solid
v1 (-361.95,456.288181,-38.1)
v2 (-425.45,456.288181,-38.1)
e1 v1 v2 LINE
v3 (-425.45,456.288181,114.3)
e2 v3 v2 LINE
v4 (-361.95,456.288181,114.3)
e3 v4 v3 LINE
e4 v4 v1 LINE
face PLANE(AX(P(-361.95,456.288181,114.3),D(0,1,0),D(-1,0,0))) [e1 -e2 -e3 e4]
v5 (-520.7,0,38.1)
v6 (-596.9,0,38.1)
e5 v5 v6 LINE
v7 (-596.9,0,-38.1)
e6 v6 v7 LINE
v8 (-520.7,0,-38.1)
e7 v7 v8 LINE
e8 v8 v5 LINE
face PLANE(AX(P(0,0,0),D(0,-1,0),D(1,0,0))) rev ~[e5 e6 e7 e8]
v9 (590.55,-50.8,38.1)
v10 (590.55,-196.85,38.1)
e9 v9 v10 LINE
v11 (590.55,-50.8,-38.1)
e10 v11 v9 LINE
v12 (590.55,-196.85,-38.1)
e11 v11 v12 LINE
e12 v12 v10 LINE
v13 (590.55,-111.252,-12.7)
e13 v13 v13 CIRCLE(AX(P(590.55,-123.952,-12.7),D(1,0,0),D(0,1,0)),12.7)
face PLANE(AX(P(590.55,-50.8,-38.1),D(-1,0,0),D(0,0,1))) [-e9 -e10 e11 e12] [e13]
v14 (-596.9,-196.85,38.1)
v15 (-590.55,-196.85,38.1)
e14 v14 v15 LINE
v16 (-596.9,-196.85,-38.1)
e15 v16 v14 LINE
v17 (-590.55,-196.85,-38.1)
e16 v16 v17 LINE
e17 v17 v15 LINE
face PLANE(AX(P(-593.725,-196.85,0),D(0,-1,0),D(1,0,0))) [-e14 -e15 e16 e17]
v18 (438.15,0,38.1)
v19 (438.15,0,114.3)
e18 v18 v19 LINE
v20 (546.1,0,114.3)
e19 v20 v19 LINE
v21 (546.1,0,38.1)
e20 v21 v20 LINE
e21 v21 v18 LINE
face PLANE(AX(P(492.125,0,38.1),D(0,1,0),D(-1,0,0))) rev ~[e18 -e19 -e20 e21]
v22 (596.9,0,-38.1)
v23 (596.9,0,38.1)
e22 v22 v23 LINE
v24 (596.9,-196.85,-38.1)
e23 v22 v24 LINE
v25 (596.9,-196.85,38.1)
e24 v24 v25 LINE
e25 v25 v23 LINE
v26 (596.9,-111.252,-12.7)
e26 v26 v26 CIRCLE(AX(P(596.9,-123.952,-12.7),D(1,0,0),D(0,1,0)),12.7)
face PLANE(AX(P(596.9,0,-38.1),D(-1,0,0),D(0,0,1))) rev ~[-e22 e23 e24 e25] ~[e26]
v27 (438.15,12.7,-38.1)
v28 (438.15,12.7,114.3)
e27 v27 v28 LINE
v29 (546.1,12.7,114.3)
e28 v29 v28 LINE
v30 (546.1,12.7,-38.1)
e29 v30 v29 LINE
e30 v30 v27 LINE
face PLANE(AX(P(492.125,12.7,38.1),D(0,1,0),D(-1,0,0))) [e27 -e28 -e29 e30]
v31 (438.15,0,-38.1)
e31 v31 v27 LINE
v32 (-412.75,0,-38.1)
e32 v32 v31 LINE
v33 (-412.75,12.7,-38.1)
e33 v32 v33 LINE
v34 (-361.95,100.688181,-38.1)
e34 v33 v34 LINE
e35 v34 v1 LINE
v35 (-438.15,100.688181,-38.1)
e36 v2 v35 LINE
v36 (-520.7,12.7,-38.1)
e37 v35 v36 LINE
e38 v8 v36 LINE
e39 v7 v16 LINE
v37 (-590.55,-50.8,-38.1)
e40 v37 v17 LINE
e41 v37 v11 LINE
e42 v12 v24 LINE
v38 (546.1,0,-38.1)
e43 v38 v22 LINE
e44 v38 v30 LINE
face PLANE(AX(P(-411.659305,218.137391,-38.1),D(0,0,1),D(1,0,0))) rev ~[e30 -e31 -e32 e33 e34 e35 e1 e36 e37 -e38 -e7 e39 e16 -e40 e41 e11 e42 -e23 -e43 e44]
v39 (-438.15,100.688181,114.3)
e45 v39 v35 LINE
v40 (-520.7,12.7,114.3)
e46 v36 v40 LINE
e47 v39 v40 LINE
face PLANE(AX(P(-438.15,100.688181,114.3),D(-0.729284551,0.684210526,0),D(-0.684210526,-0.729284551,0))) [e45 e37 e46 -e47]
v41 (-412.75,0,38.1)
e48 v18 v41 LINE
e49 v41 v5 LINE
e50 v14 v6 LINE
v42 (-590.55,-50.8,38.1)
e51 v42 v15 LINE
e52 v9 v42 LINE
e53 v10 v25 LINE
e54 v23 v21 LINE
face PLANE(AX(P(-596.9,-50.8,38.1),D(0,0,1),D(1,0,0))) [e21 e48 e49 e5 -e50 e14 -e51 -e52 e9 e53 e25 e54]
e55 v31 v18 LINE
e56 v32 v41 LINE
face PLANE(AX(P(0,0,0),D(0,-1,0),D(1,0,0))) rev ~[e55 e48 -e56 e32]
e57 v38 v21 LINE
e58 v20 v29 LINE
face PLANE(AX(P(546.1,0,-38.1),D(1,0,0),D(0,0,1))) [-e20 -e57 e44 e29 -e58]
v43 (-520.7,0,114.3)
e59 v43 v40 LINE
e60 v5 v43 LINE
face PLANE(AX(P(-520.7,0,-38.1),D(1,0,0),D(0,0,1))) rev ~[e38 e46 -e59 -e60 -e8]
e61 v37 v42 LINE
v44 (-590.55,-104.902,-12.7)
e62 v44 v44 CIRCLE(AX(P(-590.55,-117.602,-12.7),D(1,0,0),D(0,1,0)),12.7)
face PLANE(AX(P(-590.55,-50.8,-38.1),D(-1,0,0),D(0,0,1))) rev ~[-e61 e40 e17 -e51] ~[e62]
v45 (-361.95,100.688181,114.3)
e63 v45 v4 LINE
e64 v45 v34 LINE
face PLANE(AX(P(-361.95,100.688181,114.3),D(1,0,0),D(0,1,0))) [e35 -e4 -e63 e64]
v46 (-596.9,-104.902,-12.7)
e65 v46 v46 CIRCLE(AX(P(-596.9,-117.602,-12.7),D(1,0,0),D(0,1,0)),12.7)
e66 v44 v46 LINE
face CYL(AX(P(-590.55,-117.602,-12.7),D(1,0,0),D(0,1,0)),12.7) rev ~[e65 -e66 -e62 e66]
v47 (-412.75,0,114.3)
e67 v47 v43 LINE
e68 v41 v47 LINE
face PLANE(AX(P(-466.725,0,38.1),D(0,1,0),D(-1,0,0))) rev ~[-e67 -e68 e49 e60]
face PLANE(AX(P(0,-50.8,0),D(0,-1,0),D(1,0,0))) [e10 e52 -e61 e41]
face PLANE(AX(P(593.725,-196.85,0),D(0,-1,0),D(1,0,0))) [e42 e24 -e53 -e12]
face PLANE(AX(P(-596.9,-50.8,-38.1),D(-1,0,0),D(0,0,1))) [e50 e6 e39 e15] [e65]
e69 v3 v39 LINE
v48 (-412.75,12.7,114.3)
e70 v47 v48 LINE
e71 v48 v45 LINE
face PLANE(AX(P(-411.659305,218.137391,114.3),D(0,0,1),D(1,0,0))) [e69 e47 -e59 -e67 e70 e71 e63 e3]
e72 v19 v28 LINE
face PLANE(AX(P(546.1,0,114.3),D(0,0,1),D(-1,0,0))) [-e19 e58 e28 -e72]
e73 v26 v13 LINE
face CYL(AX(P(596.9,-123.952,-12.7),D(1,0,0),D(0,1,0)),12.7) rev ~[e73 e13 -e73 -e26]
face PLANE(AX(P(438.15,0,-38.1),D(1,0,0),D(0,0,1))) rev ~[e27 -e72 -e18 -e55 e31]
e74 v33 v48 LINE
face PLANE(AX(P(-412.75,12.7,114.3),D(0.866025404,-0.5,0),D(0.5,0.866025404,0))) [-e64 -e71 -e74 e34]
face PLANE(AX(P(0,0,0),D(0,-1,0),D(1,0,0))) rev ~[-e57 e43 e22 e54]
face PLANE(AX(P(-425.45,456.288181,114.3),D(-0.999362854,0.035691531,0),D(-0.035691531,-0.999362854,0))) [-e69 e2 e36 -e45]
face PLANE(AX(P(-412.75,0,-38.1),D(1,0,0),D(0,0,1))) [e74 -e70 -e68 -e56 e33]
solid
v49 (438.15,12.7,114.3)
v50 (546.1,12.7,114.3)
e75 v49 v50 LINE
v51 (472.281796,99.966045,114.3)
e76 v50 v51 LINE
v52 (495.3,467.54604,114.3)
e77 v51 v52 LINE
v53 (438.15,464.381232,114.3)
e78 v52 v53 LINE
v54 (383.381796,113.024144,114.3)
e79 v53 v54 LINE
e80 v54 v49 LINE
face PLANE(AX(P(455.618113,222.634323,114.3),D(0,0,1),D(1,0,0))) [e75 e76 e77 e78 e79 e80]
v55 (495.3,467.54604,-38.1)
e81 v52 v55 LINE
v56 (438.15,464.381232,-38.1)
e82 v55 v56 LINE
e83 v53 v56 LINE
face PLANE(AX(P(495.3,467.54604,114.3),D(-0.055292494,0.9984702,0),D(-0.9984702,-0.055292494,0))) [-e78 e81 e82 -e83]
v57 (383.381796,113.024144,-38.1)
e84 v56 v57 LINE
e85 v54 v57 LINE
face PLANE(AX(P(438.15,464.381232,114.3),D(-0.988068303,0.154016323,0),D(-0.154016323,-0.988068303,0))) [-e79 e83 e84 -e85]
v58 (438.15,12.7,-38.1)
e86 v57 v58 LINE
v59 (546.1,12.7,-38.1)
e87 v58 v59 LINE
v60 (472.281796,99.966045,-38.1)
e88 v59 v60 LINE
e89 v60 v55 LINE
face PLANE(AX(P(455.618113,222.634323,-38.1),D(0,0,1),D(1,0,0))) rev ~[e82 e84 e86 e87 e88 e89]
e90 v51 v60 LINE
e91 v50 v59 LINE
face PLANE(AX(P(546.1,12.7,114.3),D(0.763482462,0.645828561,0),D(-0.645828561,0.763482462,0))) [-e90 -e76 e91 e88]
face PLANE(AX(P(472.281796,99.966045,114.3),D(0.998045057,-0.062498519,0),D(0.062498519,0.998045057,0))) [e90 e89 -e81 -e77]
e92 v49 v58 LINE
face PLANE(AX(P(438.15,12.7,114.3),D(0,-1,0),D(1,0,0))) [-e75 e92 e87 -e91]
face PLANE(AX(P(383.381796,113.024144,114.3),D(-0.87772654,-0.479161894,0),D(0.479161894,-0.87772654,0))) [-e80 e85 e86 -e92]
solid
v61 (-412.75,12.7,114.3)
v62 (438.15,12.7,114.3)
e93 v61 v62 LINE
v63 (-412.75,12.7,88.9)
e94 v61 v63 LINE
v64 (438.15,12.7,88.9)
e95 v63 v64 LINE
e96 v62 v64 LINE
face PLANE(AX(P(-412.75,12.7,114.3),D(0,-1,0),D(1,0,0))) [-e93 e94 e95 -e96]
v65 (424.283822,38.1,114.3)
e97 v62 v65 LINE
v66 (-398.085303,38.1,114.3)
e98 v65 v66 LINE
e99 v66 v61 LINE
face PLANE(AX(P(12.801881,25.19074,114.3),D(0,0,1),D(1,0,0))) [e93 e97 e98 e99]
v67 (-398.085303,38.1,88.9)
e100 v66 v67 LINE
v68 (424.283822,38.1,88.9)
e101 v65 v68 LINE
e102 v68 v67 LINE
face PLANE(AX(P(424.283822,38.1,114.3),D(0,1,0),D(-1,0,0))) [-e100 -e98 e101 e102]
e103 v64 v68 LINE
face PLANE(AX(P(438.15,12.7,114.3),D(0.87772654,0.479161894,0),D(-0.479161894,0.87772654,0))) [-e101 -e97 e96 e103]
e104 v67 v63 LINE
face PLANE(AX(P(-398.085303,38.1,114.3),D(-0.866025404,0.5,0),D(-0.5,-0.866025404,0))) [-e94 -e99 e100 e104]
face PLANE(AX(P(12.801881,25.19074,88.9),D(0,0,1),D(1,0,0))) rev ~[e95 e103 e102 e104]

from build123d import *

# Parameters (mm, degrees)
F1_DEPTH  = 50.8
F2_W      = 6.35
F2_H      = 76.2
F3_DEPTH  = 146.05
F4_R      = 12.7
F5_DEPTH  = 25.4
F6_R      = 12.7
F7_DEPTH  = 25.4
F8_W      = 107.95
F8_H      = 152.4
F9_DEPTH  = 12.7
F12_DEPTH = 152.4
F14_DEPTH = 25.4
F15_DEPTH = 152.4


# Not quite as in the source:
# - a feature names something its author has since deleted; it is built from what else it names


with BuildPart() as f1:
    # F0 (on Front) → F1 (new body)
    with BuildSketch(Plane.XZ):
        Polygon((-590.55, 38.1), (-596.9, 38.1), (-596.9, -38.1), (-590.55, -38.1), (590.55, -38.1), (596.9, -38.1), (596.9, 38.1), (590.55, 38.1), align=None)
    extrude(amount=F1_DEPTH)

    # F2 (on face) → F3 (join)
    with BuildSketch(Plane.XZ.offset(50.8)):
        with Locations((-593.725, 0)):
            Rectangle(F2_W, F2_H)
        with Locations((593.725, 0)):
            Rectangle(F2_W, F2_H)
    extrude(amount=F3_DEPTH)

    # F4 (on face) → F5 (cut)
    with BuildSketch(Plane.YZ.offset(-590.55)):
        with Locations((-117.602, -12.7)):
            Circle(F4_R)
    extrude(amount=-F5_DEPTH, mode=Mode.SUBTRACT)

    # F6 (on face) → F7 (cut)
    with BuildSketch(Plane.YZ.offset(596.9)):
        with Locations((-123.952, -12.7)):
            Circle(F6_R)
    extrude(amount=-F7_DEPTH, mode=Mode.SUBTRACT)

    # F8 (on face) → F9 (join)
    with BuildSketch(Plane(origin=(0, 0, 0), x_dir=(-1, 0, 0), z_dir=(0, 1, 0))):
        with Locations((-492.125, 38.1)):
            Rectangle(F8_W, F8_H)
        with Locations((466.725, 38.1)):
            Rectangle(F8_W, F8_H)
    extrude(amount=F9_DEPTH)

    # F11 (on face) → F12 (join)
    with BuildSketch(Plane.XY.offset(114.3)):
        Polygon((-520.7, 12.7), (-412.75, 12.7), (-361.95, 100.6881810245), (-361.95, 456.2881810245), (-425.45, 456.2881810245), (-438.15, 100.6881810245), align=None)
    extrude(amount=-F12_DEPTH)


with BuildPart() as f14:
    # F13 (on face) → F14 (new body)
    with BuildSketch(Plane.XY.offset(114.3)):
        Polygon((-398.0853031626, 38.1), (-412.75, 12.7), (438.15, 12.7), (424.2838223851, 38.1), align=None)
    extrude(amount=-F14_DEPTH)


with BuildPart() as f15:
    # F10 (on face) → F15 (new body)
    with BuildSketch(Plane.XY.offset(114.3)):
        Polygon((383.38179553, 113.0241435505), (438.15, 12.7), (546.1, 12.7), (472.28179553, 99.966045452), (495.3, 467.5460398246), (438.15, 464.3812322496), align=None)
    extrude(amount=-F15_DEPTH)


solid = Compound([f1.part, f14.part, f15.part])
